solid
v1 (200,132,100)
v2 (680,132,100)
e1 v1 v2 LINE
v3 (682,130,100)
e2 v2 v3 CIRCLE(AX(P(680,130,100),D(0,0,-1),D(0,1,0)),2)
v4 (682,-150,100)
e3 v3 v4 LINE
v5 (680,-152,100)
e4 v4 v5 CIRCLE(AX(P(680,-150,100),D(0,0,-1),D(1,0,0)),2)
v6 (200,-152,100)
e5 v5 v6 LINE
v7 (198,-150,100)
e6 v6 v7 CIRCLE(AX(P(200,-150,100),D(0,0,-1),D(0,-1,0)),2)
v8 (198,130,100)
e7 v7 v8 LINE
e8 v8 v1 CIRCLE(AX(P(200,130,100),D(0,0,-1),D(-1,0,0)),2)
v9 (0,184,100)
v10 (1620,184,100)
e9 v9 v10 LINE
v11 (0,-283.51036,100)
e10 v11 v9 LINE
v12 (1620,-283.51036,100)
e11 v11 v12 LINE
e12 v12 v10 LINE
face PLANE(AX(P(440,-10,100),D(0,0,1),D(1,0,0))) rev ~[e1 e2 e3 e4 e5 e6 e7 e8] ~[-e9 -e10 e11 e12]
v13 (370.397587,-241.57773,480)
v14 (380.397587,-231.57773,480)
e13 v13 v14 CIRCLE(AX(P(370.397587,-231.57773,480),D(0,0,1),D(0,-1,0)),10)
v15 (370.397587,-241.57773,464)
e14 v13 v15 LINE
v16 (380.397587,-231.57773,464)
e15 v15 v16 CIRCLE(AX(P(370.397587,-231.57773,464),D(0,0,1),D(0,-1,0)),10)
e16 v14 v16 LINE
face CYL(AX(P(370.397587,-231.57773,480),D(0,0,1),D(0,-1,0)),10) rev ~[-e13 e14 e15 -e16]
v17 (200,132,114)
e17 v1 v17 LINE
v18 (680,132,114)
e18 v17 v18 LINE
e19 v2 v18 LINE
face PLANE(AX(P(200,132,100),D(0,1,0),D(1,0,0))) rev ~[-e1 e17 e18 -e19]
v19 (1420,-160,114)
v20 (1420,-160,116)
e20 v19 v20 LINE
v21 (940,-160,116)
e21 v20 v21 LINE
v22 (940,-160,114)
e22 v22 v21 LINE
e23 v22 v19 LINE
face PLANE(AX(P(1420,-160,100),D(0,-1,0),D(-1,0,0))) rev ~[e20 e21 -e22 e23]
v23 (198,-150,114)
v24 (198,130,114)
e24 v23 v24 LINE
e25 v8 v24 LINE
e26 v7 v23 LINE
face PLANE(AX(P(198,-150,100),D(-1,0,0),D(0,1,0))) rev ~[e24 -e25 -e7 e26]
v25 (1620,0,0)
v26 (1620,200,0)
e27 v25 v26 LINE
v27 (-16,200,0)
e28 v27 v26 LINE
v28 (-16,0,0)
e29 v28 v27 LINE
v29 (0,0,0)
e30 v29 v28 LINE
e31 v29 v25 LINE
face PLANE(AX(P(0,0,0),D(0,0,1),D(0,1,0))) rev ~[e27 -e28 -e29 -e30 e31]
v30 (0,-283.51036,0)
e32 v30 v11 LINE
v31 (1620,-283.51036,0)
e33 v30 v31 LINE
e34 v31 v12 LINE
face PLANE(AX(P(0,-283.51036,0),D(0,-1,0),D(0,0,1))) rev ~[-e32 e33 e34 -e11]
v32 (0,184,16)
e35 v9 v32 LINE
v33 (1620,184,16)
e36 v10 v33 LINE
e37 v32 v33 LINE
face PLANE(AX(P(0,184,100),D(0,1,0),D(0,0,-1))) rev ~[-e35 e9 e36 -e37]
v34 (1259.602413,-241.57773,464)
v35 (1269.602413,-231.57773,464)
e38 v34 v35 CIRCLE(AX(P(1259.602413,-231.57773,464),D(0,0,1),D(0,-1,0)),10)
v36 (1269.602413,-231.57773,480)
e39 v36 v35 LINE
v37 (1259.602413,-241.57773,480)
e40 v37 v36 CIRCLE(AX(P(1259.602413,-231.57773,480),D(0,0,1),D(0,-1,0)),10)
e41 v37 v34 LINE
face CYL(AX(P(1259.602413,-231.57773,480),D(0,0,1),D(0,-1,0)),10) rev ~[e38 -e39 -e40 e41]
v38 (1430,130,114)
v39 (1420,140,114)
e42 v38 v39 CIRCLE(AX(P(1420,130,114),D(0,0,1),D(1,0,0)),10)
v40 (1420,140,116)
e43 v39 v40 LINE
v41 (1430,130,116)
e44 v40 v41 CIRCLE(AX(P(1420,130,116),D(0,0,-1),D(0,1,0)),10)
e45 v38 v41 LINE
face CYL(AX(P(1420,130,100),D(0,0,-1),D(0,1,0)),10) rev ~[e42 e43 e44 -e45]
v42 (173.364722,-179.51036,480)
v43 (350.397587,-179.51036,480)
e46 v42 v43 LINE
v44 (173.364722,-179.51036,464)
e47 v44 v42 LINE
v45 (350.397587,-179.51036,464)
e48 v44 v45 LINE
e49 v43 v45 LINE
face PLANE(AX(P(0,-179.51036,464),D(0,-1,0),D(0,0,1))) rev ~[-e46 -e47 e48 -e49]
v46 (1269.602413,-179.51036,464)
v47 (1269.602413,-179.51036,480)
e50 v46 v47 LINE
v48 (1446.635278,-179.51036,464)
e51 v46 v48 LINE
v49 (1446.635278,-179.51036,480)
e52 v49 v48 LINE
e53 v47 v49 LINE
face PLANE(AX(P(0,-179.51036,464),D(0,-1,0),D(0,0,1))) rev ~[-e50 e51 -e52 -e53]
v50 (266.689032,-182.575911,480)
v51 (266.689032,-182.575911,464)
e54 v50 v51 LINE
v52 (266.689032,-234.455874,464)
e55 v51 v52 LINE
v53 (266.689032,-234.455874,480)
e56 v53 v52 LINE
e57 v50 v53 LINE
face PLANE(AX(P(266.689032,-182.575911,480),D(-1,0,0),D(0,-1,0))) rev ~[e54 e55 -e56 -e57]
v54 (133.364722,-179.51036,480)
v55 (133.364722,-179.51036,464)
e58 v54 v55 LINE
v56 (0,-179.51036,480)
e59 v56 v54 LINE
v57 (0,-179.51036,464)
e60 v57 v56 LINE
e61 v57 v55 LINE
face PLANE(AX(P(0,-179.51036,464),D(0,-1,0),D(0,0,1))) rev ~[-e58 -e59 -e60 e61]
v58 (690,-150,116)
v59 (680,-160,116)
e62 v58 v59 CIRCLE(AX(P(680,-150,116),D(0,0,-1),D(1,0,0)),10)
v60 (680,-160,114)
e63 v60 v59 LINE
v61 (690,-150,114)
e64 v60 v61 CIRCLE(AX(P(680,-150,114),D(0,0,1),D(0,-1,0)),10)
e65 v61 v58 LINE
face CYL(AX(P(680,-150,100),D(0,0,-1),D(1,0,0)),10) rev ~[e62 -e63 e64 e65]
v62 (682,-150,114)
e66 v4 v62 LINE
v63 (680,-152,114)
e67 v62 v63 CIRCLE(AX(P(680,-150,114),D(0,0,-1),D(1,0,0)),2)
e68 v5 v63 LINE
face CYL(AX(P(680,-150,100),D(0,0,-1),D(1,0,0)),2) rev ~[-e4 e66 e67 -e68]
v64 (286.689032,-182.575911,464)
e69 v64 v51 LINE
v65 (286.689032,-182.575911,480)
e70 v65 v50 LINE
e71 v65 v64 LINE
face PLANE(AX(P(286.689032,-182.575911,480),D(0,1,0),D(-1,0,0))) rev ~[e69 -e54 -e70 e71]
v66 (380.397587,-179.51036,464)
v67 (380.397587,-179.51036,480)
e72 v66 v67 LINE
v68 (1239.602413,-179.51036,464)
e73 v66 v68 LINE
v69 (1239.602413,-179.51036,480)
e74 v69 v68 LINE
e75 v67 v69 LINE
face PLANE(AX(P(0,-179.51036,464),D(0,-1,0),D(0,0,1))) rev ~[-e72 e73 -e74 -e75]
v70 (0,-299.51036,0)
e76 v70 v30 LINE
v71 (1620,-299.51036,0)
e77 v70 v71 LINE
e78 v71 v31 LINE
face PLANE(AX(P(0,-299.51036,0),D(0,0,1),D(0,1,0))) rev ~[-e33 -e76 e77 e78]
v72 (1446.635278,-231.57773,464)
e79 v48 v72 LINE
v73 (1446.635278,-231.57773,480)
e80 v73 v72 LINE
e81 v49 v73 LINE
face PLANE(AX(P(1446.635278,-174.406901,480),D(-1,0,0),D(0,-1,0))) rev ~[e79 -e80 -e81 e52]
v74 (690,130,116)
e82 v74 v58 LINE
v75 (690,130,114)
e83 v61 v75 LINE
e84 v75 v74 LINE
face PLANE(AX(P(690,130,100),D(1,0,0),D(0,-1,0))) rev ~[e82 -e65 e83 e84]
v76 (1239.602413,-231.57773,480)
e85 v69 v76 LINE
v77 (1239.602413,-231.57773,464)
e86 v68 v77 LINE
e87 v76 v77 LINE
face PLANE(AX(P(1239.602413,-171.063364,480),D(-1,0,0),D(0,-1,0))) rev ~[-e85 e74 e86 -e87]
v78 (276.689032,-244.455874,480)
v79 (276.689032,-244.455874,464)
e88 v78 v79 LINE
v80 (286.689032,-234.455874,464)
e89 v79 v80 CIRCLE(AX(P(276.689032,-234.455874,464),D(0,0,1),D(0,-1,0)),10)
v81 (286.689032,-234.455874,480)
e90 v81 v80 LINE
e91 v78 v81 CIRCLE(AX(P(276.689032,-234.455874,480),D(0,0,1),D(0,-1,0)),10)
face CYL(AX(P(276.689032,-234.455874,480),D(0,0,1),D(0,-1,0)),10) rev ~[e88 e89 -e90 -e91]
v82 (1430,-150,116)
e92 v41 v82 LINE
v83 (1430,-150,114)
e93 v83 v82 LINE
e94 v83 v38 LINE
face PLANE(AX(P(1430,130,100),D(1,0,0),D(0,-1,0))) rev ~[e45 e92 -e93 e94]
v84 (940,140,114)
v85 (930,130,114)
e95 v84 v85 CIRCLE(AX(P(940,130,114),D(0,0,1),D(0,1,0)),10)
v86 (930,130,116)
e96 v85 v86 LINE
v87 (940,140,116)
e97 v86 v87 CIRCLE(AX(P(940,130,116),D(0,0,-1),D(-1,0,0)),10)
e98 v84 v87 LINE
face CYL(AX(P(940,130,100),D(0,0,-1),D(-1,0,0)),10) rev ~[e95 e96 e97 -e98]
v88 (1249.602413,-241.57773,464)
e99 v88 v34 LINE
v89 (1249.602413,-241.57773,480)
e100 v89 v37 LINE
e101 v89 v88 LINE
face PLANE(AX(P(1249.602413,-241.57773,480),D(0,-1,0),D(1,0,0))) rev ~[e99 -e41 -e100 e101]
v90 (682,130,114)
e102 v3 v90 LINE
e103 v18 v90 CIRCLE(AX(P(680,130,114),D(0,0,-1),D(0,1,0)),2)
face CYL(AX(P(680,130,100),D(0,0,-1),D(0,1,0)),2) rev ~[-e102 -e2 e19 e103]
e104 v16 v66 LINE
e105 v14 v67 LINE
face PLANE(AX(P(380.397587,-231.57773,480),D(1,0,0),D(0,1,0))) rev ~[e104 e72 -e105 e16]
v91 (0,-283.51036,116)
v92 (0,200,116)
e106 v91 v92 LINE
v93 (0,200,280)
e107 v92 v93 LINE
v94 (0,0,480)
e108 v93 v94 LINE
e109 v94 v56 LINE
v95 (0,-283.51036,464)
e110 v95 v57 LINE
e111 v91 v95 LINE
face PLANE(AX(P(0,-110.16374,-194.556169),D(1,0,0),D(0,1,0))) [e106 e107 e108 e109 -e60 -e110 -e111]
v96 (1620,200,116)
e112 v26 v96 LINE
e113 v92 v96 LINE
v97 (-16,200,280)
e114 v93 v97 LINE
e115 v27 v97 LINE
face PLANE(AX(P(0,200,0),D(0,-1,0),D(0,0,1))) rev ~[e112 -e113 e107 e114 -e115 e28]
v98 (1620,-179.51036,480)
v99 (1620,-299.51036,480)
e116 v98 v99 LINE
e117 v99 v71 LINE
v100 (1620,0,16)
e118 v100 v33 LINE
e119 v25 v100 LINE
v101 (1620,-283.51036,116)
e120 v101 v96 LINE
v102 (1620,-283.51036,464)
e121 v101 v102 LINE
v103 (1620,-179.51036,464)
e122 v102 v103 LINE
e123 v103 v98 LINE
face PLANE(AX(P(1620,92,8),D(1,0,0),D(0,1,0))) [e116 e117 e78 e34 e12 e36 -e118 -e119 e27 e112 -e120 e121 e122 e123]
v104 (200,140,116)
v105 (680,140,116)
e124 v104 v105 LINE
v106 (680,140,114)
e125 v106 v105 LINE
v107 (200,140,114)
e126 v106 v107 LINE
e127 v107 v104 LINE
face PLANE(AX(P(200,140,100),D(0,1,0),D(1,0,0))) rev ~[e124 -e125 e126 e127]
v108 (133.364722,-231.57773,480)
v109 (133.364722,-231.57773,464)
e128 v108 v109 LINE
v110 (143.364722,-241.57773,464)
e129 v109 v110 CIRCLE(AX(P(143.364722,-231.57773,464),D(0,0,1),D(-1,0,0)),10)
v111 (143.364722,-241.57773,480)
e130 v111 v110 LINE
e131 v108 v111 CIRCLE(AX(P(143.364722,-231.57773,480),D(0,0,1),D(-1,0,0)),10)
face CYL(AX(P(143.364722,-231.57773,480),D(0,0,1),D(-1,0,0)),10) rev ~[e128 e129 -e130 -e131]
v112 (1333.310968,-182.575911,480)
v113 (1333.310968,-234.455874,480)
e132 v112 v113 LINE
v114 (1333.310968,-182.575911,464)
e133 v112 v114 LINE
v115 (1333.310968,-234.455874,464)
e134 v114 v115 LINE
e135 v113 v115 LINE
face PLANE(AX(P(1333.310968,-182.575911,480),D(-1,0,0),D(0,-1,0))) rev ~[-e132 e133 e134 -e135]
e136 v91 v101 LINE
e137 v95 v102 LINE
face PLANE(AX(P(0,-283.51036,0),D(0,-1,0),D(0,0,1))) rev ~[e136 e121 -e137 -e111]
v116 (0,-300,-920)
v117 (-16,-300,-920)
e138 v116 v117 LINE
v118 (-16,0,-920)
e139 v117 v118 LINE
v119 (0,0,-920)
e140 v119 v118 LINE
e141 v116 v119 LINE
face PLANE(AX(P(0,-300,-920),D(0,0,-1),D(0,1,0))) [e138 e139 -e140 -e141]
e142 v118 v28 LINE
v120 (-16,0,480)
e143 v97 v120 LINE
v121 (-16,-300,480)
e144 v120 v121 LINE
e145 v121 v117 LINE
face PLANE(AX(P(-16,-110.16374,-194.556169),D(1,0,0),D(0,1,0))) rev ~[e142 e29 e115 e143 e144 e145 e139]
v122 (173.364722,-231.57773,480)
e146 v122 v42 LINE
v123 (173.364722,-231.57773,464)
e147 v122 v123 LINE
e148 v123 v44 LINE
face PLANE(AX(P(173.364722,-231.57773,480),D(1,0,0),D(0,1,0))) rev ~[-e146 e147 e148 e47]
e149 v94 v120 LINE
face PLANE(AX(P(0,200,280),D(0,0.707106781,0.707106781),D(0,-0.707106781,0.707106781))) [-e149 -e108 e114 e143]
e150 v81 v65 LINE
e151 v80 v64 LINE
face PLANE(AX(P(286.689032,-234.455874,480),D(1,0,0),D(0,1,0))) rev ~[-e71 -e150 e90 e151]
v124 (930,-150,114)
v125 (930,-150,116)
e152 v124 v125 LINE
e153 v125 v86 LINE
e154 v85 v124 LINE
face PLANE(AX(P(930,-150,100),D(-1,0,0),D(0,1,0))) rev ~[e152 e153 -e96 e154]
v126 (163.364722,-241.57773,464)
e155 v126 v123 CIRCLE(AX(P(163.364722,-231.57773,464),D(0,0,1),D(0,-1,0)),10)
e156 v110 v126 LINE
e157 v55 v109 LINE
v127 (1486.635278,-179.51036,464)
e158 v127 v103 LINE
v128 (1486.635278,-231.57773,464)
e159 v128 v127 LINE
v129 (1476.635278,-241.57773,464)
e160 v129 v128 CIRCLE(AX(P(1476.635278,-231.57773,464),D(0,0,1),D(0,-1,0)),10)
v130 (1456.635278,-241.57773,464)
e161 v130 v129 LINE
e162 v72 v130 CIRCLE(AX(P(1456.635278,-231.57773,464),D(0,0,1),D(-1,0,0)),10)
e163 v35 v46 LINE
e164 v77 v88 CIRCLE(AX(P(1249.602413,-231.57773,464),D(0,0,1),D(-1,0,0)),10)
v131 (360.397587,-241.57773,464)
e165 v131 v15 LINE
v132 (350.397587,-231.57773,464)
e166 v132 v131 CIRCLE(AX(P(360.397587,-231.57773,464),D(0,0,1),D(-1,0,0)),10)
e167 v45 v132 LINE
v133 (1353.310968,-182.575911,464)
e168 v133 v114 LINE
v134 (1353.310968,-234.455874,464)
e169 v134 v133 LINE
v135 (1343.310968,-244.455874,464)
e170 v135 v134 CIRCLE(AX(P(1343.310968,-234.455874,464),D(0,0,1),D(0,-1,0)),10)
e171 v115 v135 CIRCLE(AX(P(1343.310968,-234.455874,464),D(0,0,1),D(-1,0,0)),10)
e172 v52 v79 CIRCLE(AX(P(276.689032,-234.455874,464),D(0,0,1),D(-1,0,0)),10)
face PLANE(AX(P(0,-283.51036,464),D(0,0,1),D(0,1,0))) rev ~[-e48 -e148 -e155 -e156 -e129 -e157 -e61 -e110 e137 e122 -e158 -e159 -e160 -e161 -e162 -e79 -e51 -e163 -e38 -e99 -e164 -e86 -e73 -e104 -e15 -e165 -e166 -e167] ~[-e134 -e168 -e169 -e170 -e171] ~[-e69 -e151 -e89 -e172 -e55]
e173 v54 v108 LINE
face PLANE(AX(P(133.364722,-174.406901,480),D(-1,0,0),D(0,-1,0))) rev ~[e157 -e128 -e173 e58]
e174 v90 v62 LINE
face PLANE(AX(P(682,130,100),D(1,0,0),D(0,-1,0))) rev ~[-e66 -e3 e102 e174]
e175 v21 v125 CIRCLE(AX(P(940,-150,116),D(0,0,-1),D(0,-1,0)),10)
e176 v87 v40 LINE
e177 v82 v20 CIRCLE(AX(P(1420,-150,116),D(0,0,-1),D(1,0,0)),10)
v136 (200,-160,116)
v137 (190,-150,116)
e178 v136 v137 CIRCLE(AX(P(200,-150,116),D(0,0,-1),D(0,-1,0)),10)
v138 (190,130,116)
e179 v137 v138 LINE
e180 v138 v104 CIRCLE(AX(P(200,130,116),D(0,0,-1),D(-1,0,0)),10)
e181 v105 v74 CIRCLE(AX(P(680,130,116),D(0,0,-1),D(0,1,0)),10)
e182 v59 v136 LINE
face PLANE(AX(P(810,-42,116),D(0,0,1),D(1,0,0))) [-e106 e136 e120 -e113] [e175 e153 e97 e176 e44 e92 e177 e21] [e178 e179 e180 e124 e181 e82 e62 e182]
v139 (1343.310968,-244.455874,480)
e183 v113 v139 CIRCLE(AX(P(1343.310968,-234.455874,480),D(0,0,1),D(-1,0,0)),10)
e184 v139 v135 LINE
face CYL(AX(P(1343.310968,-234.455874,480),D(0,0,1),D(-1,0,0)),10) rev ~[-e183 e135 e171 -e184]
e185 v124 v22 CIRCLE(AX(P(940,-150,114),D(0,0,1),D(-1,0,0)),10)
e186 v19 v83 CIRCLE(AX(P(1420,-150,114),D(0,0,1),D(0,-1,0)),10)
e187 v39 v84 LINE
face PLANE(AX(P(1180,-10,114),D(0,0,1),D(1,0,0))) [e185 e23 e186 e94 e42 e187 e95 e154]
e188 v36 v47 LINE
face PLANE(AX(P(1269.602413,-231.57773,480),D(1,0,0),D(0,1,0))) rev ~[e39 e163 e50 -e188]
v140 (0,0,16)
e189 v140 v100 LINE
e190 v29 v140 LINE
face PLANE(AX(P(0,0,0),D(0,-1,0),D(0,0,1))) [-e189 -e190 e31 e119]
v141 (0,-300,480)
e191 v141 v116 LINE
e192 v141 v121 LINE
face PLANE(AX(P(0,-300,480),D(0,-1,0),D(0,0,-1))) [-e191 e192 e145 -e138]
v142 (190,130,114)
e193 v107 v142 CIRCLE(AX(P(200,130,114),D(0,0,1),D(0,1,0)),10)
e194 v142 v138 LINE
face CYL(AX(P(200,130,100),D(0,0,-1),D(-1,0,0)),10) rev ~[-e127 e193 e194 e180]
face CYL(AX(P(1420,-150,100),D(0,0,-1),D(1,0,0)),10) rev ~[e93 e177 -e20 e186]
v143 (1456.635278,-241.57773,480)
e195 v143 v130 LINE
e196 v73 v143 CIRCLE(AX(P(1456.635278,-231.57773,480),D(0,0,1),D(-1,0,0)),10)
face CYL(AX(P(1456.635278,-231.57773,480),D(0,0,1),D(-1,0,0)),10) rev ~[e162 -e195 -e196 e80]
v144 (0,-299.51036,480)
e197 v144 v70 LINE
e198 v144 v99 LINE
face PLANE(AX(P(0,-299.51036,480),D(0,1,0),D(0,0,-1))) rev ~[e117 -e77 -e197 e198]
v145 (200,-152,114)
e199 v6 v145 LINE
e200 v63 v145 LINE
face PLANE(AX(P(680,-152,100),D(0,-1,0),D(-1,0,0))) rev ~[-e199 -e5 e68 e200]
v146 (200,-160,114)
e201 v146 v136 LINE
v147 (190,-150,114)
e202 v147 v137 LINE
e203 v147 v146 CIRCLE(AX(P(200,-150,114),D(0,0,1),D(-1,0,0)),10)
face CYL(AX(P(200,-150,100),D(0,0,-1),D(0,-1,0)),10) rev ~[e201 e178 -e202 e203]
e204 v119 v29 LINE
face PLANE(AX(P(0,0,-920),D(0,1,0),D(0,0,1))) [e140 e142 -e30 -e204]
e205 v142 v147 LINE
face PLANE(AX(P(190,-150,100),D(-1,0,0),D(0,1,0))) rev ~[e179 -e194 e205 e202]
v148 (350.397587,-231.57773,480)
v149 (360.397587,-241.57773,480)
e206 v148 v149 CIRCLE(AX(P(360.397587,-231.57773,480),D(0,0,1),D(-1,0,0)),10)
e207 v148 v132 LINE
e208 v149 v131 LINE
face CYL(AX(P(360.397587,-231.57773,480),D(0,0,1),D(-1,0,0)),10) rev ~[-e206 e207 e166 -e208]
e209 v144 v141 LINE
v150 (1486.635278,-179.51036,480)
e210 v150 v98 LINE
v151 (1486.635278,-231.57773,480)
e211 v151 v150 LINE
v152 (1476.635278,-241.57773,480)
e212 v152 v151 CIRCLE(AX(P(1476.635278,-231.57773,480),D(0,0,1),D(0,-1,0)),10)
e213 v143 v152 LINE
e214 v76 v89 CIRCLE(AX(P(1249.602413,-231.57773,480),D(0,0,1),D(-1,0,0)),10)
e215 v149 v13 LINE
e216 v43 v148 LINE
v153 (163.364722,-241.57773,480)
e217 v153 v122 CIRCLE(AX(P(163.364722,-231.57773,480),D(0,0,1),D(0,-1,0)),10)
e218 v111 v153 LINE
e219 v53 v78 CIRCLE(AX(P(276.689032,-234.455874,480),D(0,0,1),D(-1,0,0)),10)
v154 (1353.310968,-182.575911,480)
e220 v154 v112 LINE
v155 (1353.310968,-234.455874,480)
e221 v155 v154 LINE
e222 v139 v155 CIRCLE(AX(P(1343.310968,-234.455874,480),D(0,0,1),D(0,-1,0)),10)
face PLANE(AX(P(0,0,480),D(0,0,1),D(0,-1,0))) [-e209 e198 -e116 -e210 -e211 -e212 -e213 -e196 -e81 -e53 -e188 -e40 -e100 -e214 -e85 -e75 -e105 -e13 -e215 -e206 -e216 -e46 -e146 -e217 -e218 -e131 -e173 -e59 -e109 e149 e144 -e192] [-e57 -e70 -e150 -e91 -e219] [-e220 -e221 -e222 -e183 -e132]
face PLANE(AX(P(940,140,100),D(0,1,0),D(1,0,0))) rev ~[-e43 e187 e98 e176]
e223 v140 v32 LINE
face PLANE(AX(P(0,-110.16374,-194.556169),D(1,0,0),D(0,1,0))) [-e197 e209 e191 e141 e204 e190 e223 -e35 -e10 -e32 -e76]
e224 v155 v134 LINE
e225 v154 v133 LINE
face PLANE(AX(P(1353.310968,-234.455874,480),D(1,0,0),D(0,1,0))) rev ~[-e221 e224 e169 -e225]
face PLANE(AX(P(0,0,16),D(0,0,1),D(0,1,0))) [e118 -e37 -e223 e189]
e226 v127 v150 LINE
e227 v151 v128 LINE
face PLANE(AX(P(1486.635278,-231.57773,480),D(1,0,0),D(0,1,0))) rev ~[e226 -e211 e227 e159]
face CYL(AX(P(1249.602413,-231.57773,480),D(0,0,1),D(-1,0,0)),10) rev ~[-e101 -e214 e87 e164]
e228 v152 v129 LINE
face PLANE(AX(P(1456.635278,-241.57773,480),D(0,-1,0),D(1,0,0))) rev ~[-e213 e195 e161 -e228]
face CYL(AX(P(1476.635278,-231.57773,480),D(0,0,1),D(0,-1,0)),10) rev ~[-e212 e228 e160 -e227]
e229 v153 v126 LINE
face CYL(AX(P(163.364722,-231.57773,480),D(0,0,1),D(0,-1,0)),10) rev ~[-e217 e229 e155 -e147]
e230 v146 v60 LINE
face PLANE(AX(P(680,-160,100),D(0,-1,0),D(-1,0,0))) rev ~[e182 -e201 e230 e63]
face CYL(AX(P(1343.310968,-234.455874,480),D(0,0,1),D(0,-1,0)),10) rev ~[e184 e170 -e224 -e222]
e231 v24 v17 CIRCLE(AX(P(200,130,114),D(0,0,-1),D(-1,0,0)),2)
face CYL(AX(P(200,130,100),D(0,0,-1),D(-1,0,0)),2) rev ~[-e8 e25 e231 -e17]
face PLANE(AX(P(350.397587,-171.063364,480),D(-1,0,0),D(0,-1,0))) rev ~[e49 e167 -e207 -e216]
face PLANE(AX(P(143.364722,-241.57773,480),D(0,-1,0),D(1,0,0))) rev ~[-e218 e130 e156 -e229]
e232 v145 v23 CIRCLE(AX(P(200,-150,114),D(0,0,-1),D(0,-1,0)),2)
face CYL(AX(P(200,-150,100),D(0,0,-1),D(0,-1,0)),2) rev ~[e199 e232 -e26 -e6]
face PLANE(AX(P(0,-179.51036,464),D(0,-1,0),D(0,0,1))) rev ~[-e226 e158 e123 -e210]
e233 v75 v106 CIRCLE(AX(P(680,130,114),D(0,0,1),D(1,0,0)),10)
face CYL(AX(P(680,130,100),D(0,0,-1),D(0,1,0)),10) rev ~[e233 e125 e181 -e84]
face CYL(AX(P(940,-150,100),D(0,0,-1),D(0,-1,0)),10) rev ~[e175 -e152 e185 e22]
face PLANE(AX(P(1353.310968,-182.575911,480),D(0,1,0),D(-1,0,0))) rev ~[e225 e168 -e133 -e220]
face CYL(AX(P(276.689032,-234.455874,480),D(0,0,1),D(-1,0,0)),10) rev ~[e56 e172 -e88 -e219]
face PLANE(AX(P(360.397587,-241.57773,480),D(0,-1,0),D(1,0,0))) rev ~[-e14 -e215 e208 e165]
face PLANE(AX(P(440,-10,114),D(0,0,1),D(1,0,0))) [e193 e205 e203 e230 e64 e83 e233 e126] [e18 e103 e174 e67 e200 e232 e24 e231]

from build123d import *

# Parameters (mm, degrees)
F1_DEPTH = 16
F3_W     = 1620
F3_H     = 484
F4_DEPTH = 16
F5_DEPTH = 14
F6_W     = 184
F6_H     = 16
F6_W_2   = 16
F6_H_2   = 464
F7_DEPTH = 1620
F9_DEPTH = 25


# Not quite as in the source:
# - a feature names something its author has since deleted; it is built from what else it names


with BuildPart() as f1:
    # F0 (on Right) → F1 (new body)
    with BuildSketch(Plane.YZ):
        Polygon((0, 480), (-300, 480), (-300, -920), (0, -920), (0, 0), (200, 0), (200, 280), align=None)
    extrude(amount=-F1_DEPTH)

    # F3 (on offset) → F4 (join)
    with BuildSketch(Plane.XY.offset(100)):
        with Locations((810, -42)):
            Rectangle(F3_W, F3_H)
        with BuildLine():
            Line((200, 140), (680, 140))
            ThreePointArc((680, 140), (687.0710678119, 137.0710678119), (690, 130))
            Line((690, 130), (690, -150))
            ThreePointArc((690, -150), (687.0710678119, -157.0710678119), (680, -160))
            Line((680, -160), (200, -160))
            ThreePointArc((200, -160), (192.9289321881, -157.0710678119), (190, -150))
            Line((190, -150), (190, 130))
            ThreePointArc((190, 130), (192.9289321881, 137.0710678119), (200, 140))
        make_face(mode=Mode.SUBTRACT)
        with BuildLine():
            Line((940, 140), (1420, 140))
            ThreePointArc((1420, 140), (1427.0710678119, 137.0710678119), (1430, 130))
            Line((1430, 130), (1430, -150))
            ThreePointArc((1430, -150), (1427.0710678119, -157.0710678119), (1420, -160))
            Line((1420, -160), (940, -160))
            ThreePointArc((940, -160), (932.9289321881, -157.0710678119), (930, -150))
            Line((930, -150), (930, 130))
            ThreePointArc((930, 130), (932.9289321881, 137.0710678119), (940, 140))
        make_face(mode=Mode.SUBTRACT)
    extrude(amount=F4_DEPTH)

    # F3 (on offset) → F5 (join)
    with BuildSketch(Plane.XY.offset(100)):
        with BuildLine():
            ThreePointArc((690, 130), (687.0710678119, 137.0710678119), (680, 140))
            Line((680, 140), (200, 140))
            ThreePointArc((200, 140), (192.9289321881, 137.0710678119), (190, 130))
            Line((190, 130), (190, -150))
            ThreePointArc((190, -150), (192.9289321881, -157.0710678119), (200, -160))
            Line((200, -160), (680, -160))
            ThreePointArc((680, -160), (687.0710678119, -157.0710678119), (690, -150))
            Line((690, -150), (690, 130))
        make_face()
        with BuildLine():
            ThreePointArc((682, -150), (681.4142135624, -151.4142135624), (680, -152))
            Line((680, -152), (200, -152))
            ThreePointArc((200, -152), (198.5857864376, -151.4142135624), (198, -150))
            Line((198, -150), (198, 130))
            ThreePointArc((198, 130), (198.5857864376, 131.4142135624), (200, 132))
            Line((200, 132), (680, 132))
            ThreePointArc((680, 132), (681.4142135624, 131.4142135624), (682, 130))
            Line((682, 130), (682, -150))
        make_face(mode=Mode.SUBTRACT)
        with BuildLine():
            ThreePointArc((1430, 130), (1427.0710678119, 137.0710678119), (1420, 140))
            Line((1420, 140), (940, 140))
            ThreePointArc((940, 140), (932.9289321881, 137.0710678119), (930, 130))
            Line((930, 130), (930, -150))
            ThreePointArc((930, -150), (932.9289321881, -157.0710678119), (940, -160))
            Line((940, -160), (1420, -160))
            ThreePointArc((1420, -160), (1427.0710678119, -157.0710678119), (1430, -150))
            Line((1430, -150), (1430, 130))
        make_face()
    extrude(amount=F5_DEPTH)

    # F6 (on face) → F7 (join)
    with BuildSketch(Plane.YZ):
        with Locations((92, 8)):
            Rectangle(F6_W, F6_H)
        Polygon((184, 100), (184, 16), (184, 0), (200, 0), (200, 100), align=None)
        with Locations((-291.5103597641, 232)):
            Rectangle(F6_W_2, F6_H_2)
        Polygon((-299.5103597641, 480), (-299.5103597641, 464), (-283.5103597641, 464), (-179.5103597641, 464), (-179.5103597641, 480), align=None)
    extrude(amount=F7_DEPTH)

    # F8 (on face) → F9 (cut)
    with BuildSketch(Plane.XY.offset(480)):
        with BuildLine():
            Line((286.6890323162, -182.5759112835), (266.6890323162, -182.5759112835))
            Line((266.6890323162, -182.5759112835), (266.6890323162, -234.4558739662))
            ThreePointArc((266.6890323162, -234.4558739662), (269.6179645043, -241.5269417781), (276.6890323162, -244.4558739662))
            ThreePointArc((276.6890323162, -244.4558739662), (283.7601001281, -241.5269417781), (286.6890323162, -234.4558739662))
            Line((286.6890323162, -234.4558739662), (286.6890323162, -182.5759112835))
        make_face()
        with BuildLine():
            Line((360.3975868225, -241.5777295828), (370.3975868225, -241.5777295828))
            ThreePointArc((370.3975868225, -241.5777295828), (377.4686546344, -238.6487973947), (380.3975868225, -231.5777295828))
            Line((380.3975868225, -231.5777295828), (380.3975868225, -171.0633635521))
            Line((380.3975868225, -171.0633635521), (350.3975868225, -171.0633635521))
            Line((350.3975868225, -171.0633635521), (350.3975868225, -231.5777295828))
            ThreePointArc((350.3975868225, -231.5777295828), (353.3265190106, -238.6487973947), (360.3975868225, -241.5777295828))
        make_face()
        with BuildLine():
            Line((173.3647221327, -231.5777295828), (173.3647221327, -174.4069010019))
            Line((173.3647221327, -174.4069010019), (133.3647221327, -174.4069010019))
            Line((133.3647221327, -174.4069010019), (133.3647221327, -231.5777295828))
            ThreePointArc((133.3647221327, -231.5777295828), (136.2936543208, -238.6487973947), (143.3647221327, -241.5777295828))
            Line((143.3647221327, -241.5777295828), (163.3647221327, -241.5777295828))
            ThreePointArc((163.3647221327, -241.5777295828), (170.4357899445, -238.6487973947), (173.3647221327, -231.5777295828))
        make_face()
        with BuildLine():
            ThreePointArc((1239.6024131775, -231.5777295828), (1242.5313453656, -238.6487973947), (1249.6024131775, -241.5777295828))
            Line((1249.6024131775, -241.5777295828), (1259.6024131775, -241.5777295828))
            ThreePointArc((1259.6024131775, -241.5777295828), (1266.6734809894, -238.6487973947), (1269.6024131775, -231.5777295828))
            Line((1269.6024131775, -231.5777295828), (1269.6024131775, -171.0633635521))
            Line((1269.6024131775, -171.0633635521), (1239.6024131775, -171.0633635521))
            Line((1239.6024131775, -171.0633635521), (1239.6024131775, -231.5777295828))
        make_face()
        with BuildLine():
            ThreePointArc((1343.3109676838, -244.4558739662), (1350.3820354957, -241.5269417781), (1353.3109676838, -234.4558739662))
            Line((1353.3109676838, -234.4558739662), (1353.3109676838, -182.5759112835))
            Line((1353.3109676838, -182.5759112835), (1333.3109676838, -182.5759112835))
            Line((1333.3109676838, -182.5759112835), (1333.3109676838, -234.4558739662))
            ThreePointArc((1333.3109676838, -234.4558739662), (1336.2398998719, -241.5269417781), (1343.3109676838, -244.4558739662))
        make_face()
        with BuildLine():
            ThreePointArc((1446.6352778673, -231.5777295828), (1449.5642100555, -238.6487973947), (1456.6352778673, -241.5777295828))
            Line((1456.6352778673, -241.5777295828), (1476.6352778673, -241.5777295828))
            ThreePointArc((1476.6352778673, -241.5777295828), (1483.7063456792, -238.6487973947), (1486.6352778673, -231.5777295828))
            Line((1486.6352778673, -231.5777295828), (1486.6352778673, -174.4069010019))
            Line((1486.6352778673, -174.4069010019), (1446.6352778673, -174.4069010019))
            Line((1446.6352778673, -174.4069010019), (1446.6352778673, -231.5777295828))
        make_face()
    extrude(amount=-F9_DEPTH, mode=Mode.SUBTRACT)


solid = f1.part
